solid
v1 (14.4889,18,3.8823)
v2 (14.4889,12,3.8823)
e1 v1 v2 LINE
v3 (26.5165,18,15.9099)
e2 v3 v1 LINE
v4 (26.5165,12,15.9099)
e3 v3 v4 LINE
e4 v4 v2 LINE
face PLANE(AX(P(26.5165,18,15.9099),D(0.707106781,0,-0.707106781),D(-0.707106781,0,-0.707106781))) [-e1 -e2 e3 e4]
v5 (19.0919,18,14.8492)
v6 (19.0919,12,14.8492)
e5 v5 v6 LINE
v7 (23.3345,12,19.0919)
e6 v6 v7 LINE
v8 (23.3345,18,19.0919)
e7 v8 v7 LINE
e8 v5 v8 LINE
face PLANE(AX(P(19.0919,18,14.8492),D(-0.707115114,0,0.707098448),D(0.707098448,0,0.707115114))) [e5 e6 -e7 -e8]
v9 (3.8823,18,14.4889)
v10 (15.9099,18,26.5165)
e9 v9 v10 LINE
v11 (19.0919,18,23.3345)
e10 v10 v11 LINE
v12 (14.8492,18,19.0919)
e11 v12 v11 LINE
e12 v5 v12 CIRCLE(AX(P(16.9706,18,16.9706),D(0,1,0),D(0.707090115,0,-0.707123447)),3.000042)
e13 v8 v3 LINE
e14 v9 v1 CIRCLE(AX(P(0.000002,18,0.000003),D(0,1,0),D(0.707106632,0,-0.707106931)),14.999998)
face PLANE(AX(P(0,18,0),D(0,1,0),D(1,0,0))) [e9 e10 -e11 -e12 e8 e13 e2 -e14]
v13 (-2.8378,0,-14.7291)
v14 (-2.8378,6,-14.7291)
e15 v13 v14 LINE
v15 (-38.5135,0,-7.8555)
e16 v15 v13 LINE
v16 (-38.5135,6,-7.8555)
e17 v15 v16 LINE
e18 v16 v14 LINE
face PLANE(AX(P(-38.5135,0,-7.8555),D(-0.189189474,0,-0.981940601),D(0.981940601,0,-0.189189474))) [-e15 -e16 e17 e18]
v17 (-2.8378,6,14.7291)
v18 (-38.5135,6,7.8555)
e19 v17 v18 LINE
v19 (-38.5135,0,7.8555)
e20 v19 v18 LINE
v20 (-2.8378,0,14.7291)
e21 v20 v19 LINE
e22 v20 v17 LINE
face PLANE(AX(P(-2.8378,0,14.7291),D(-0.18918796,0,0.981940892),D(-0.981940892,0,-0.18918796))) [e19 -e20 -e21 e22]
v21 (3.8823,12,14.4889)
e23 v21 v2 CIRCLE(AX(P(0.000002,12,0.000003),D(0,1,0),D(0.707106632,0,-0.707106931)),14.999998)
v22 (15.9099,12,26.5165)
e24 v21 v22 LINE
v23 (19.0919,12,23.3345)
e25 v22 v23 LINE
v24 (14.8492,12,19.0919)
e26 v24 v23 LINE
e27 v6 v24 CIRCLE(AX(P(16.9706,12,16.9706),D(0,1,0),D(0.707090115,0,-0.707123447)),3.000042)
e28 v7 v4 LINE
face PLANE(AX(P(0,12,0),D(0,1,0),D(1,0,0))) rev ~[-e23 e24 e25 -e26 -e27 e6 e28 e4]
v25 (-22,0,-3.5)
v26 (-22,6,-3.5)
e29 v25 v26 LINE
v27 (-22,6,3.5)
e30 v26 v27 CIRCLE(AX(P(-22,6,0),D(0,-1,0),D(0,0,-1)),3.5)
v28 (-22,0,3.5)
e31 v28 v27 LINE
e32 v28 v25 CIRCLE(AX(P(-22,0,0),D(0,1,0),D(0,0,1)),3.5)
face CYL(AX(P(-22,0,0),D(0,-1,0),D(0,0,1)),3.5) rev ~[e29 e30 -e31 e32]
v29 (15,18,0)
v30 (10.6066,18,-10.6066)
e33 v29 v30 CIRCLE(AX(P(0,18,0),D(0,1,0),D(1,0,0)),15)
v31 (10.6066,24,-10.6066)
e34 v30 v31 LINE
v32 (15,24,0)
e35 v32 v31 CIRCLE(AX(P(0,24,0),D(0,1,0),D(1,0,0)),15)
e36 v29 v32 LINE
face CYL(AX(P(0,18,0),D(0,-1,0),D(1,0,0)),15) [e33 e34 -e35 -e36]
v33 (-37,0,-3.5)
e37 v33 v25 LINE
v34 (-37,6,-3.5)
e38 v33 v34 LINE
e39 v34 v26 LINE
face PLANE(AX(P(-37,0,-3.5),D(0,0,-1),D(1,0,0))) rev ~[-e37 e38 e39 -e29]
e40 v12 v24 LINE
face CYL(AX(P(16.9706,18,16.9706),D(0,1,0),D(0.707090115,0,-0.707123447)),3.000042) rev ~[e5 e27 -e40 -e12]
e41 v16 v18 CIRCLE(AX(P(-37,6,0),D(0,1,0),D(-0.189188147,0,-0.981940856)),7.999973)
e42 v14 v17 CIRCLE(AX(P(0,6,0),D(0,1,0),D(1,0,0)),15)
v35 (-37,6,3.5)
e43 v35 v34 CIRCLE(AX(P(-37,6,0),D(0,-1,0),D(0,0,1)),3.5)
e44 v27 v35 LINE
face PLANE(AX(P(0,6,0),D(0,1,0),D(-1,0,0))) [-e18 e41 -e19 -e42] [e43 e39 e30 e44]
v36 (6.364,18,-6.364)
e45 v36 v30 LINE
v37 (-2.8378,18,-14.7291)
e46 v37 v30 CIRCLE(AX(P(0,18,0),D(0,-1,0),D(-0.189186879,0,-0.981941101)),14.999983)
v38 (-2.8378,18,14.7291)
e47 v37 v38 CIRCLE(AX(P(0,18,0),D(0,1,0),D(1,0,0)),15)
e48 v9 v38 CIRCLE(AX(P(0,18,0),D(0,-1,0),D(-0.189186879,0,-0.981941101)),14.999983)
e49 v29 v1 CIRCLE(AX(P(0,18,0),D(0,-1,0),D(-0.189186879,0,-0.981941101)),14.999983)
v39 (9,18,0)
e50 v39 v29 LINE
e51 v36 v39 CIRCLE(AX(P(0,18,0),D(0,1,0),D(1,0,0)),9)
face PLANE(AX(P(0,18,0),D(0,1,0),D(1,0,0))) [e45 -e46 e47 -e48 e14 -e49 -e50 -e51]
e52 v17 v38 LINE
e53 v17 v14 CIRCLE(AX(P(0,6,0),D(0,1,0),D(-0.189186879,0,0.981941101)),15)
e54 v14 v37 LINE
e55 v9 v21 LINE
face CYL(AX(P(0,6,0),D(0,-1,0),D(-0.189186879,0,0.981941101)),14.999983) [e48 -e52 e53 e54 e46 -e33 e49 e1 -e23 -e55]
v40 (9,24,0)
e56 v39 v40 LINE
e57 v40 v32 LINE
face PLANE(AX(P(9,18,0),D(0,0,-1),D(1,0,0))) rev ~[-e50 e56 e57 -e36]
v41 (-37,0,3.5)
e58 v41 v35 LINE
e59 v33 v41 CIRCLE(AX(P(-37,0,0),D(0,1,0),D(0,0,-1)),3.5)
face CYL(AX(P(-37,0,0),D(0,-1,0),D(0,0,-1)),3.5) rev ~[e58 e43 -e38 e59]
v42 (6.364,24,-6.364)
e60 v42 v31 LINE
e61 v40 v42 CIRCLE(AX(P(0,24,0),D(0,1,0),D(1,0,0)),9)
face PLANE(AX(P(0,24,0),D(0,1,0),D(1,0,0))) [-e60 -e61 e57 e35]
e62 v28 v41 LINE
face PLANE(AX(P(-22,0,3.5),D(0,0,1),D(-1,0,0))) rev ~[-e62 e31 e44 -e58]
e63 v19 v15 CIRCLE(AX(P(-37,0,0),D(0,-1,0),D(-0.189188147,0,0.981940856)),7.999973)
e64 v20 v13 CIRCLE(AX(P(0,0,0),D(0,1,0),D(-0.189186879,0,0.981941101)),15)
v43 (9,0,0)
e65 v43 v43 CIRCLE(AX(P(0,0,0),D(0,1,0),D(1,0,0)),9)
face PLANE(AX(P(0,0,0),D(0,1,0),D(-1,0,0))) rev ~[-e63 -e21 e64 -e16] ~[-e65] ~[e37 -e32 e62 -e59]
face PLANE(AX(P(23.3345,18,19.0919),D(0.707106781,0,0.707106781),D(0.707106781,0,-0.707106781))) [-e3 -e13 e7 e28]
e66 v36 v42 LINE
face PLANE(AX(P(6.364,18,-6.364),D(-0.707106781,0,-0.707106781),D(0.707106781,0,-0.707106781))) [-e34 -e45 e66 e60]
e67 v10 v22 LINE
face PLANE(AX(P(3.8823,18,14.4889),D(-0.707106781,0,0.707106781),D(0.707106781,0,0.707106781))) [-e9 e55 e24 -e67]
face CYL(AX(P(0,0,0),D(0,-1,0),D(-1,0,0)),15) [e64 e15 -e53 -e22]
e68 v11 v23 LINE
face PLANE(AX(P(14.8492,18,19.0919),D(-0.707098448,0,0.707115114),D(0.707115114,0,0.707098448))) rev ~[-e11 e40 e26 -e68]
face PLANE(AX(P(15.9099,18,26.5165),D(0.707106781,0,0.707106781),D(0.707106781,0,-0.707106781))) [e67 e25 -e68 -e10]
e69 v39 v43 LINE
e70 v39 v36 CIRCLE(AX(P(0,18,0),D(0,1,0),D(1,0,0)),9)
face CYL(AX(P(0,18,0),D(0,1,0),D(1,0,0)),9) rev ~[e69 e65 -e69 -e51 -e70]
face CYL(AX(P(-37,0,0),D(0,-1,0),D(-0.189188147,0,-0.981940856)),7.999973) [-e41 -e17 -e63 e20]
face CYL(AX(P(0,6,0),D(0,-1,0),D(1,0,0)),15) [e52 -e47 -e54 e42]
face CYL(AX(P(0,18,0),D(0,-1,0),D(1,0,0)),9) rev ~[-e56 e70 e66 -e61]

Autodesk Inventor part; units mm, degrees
ref_plane "YZ Plane" through (0, 0, 0) normal (1, 0, 0) x (0, 1, 0)
ref_plane "XZ Plane" through (0, 0, 0) normal (0, 1, 0) x (-1, 0, 0)
ref_plane "XY Plane" through (0, 0, 0) normal (0, 0, 1) x (1, 0, 0)
sketch "草图1" plane through (0, 0, 0) normal (0, 1, 0) x (-1, 0, 0)
  circle A0 centre (0, 0) radius 15
  arc A1 (38.5135, -7.8555) -> (38.5135, 7.8555) centre (37, 0) ccw
  line L0 (38.5135, -7.8555) -> (2.8378, -14.7291)
  line L1 (2.8378, 14.7291) -> (39.6131, 7.6437)
  line L2 (50.7291, 0) -> (-22.1307, 0)
  arc A2 (37, -3.5) -> (37, 3.5) centre (37, 0) ccw
  arc A3 (22, 3.5) -> (22, -3.5) centre (22, 0) ccw
  line L3 (37, -3.5) -> (22, -3.5)
  line L4 (22, 3.5) -> (37, 3.5)
  dimension "d0" = 30
  dimension "d1" = 16
  dimension "d2" = 37
  dimension "d3" = 7
  dimension "d4" = 7
  dimension "d5" = 15
extrude "拉伸1" add sketch "草图1" along normal blind 6 contours L2 A0 | L2 A3 L3 A2 A1 L0 A0 | A0 L1 A1 L2 A2 L4 A3 | A0 L2
sketch "草图2" plane through (0, 6, 0) normal (0, 1, 0) x (1, 0, 0)
  line L0 (-37, 3.5) -> (-22, 3.5) projected
  arc A0 (-22, -3.5) -> (-22, 3.5) centre (-22, 0) ccw projected
  line L1 (-22, -3.5) -> (-37, -3.5) projected
  arc A1 (-37, 3.5) -> (-37, -3.5) centre (-37, 0) ccw projected
  arc A2 (-38.5135, 7.8555) -> (-38.5135, -7.8555) centre (-37, 0) ccw projected
  line L2 (-38.5135, -7.8555) -> (-2.8378, -14.7291) projected
  arc A3 (-2.8378, -14.7291) -> (-2.8378, 14.7291) centre (0, 0) ccw projected
  line L3 (-2.8378, 14.7291) -> (-38.5135, 7.8555) projected
  circle A4 centre (0, 0) radius 15
extrude "拉伸2" add sketch "草图2" along normal blind 12 contours A3 A4
sketch "草图3" plane through (0, 18, 0) normal (0, 1, 0) x (1, 0, 0)
  circle A0 centre (0, 0) radius 15 projected
  circle A1 centre (0, 0) radius 9
  dimension "d10" = 18
extrude "拉伸3" cut sketch "草图3" against normal blind 20 contours A1
sketch "草图4" plane through (0, 18, 0) normal (0, 1, 0) x (1, 0, 0)
  circle A0 centre (0, 0) radius 9 projected
  circle A1 centre (0, 0) radius 15 projected
  line L0 (9, 0) -> (15, 0)
  line L1 (6.364, 6.364) -> (10.6066, 10.6066)
  dimension "d13" = 45
extrude "拉伸4" add sketch "草图4" along normal blind 6 contours A0 L1 A1 L0 picked at (12.295, 4.0369)
sketch "草图5" plane through (0, 18, 0) normal (0, 1, 0) x (1, 0, 0)
  arc A0 (10.6066, 10.6066) -> (15, 0) centre (0, 0) ccw projected
  line L0 (15, 0) -> (9, 0) projected
  arc A1 (6.364, 6.364) -> (9, 0) centre (0, 0) ccw projected
  line L1 (0, 0) -> (21.2132, -21.2132) construction
  line L2 (26.5165, -15.9099) -> (14.4889, -3.8823)
  line L3 (3.8823, -14.4889) -> (15.9099, -26.5165)
  line L4 (26.5165, -15.9099) -> (1.7678, -12.3744) construction
  line L5 (12.3744, -1.7678) -> (15.9099, -26.5165) construction
  arc A2 (19.0919, -14.8492) -> (14.8492, -19.0919) centre (16.9706, -16.9706) ccw
  line L6 (14.8492, -19.0919) -> (19.0919, -23.3345)
  line L7 (19.0919, -14.8492) -> (23.3345, -19.0919)
  line L8 (15.9099, -26.5165) -> (19.0919, -23.3345)
  line L9 (23.3345, -19.0919) -> (26.5165, -15.9099)
  point P0 (14.1421, -14.1421)
  dimension "d16" = 45
  dimension "d17" = 15
  dimension "d20" = 6
extrude "拉伸5" add sketch "草图5" against normal blind 6
